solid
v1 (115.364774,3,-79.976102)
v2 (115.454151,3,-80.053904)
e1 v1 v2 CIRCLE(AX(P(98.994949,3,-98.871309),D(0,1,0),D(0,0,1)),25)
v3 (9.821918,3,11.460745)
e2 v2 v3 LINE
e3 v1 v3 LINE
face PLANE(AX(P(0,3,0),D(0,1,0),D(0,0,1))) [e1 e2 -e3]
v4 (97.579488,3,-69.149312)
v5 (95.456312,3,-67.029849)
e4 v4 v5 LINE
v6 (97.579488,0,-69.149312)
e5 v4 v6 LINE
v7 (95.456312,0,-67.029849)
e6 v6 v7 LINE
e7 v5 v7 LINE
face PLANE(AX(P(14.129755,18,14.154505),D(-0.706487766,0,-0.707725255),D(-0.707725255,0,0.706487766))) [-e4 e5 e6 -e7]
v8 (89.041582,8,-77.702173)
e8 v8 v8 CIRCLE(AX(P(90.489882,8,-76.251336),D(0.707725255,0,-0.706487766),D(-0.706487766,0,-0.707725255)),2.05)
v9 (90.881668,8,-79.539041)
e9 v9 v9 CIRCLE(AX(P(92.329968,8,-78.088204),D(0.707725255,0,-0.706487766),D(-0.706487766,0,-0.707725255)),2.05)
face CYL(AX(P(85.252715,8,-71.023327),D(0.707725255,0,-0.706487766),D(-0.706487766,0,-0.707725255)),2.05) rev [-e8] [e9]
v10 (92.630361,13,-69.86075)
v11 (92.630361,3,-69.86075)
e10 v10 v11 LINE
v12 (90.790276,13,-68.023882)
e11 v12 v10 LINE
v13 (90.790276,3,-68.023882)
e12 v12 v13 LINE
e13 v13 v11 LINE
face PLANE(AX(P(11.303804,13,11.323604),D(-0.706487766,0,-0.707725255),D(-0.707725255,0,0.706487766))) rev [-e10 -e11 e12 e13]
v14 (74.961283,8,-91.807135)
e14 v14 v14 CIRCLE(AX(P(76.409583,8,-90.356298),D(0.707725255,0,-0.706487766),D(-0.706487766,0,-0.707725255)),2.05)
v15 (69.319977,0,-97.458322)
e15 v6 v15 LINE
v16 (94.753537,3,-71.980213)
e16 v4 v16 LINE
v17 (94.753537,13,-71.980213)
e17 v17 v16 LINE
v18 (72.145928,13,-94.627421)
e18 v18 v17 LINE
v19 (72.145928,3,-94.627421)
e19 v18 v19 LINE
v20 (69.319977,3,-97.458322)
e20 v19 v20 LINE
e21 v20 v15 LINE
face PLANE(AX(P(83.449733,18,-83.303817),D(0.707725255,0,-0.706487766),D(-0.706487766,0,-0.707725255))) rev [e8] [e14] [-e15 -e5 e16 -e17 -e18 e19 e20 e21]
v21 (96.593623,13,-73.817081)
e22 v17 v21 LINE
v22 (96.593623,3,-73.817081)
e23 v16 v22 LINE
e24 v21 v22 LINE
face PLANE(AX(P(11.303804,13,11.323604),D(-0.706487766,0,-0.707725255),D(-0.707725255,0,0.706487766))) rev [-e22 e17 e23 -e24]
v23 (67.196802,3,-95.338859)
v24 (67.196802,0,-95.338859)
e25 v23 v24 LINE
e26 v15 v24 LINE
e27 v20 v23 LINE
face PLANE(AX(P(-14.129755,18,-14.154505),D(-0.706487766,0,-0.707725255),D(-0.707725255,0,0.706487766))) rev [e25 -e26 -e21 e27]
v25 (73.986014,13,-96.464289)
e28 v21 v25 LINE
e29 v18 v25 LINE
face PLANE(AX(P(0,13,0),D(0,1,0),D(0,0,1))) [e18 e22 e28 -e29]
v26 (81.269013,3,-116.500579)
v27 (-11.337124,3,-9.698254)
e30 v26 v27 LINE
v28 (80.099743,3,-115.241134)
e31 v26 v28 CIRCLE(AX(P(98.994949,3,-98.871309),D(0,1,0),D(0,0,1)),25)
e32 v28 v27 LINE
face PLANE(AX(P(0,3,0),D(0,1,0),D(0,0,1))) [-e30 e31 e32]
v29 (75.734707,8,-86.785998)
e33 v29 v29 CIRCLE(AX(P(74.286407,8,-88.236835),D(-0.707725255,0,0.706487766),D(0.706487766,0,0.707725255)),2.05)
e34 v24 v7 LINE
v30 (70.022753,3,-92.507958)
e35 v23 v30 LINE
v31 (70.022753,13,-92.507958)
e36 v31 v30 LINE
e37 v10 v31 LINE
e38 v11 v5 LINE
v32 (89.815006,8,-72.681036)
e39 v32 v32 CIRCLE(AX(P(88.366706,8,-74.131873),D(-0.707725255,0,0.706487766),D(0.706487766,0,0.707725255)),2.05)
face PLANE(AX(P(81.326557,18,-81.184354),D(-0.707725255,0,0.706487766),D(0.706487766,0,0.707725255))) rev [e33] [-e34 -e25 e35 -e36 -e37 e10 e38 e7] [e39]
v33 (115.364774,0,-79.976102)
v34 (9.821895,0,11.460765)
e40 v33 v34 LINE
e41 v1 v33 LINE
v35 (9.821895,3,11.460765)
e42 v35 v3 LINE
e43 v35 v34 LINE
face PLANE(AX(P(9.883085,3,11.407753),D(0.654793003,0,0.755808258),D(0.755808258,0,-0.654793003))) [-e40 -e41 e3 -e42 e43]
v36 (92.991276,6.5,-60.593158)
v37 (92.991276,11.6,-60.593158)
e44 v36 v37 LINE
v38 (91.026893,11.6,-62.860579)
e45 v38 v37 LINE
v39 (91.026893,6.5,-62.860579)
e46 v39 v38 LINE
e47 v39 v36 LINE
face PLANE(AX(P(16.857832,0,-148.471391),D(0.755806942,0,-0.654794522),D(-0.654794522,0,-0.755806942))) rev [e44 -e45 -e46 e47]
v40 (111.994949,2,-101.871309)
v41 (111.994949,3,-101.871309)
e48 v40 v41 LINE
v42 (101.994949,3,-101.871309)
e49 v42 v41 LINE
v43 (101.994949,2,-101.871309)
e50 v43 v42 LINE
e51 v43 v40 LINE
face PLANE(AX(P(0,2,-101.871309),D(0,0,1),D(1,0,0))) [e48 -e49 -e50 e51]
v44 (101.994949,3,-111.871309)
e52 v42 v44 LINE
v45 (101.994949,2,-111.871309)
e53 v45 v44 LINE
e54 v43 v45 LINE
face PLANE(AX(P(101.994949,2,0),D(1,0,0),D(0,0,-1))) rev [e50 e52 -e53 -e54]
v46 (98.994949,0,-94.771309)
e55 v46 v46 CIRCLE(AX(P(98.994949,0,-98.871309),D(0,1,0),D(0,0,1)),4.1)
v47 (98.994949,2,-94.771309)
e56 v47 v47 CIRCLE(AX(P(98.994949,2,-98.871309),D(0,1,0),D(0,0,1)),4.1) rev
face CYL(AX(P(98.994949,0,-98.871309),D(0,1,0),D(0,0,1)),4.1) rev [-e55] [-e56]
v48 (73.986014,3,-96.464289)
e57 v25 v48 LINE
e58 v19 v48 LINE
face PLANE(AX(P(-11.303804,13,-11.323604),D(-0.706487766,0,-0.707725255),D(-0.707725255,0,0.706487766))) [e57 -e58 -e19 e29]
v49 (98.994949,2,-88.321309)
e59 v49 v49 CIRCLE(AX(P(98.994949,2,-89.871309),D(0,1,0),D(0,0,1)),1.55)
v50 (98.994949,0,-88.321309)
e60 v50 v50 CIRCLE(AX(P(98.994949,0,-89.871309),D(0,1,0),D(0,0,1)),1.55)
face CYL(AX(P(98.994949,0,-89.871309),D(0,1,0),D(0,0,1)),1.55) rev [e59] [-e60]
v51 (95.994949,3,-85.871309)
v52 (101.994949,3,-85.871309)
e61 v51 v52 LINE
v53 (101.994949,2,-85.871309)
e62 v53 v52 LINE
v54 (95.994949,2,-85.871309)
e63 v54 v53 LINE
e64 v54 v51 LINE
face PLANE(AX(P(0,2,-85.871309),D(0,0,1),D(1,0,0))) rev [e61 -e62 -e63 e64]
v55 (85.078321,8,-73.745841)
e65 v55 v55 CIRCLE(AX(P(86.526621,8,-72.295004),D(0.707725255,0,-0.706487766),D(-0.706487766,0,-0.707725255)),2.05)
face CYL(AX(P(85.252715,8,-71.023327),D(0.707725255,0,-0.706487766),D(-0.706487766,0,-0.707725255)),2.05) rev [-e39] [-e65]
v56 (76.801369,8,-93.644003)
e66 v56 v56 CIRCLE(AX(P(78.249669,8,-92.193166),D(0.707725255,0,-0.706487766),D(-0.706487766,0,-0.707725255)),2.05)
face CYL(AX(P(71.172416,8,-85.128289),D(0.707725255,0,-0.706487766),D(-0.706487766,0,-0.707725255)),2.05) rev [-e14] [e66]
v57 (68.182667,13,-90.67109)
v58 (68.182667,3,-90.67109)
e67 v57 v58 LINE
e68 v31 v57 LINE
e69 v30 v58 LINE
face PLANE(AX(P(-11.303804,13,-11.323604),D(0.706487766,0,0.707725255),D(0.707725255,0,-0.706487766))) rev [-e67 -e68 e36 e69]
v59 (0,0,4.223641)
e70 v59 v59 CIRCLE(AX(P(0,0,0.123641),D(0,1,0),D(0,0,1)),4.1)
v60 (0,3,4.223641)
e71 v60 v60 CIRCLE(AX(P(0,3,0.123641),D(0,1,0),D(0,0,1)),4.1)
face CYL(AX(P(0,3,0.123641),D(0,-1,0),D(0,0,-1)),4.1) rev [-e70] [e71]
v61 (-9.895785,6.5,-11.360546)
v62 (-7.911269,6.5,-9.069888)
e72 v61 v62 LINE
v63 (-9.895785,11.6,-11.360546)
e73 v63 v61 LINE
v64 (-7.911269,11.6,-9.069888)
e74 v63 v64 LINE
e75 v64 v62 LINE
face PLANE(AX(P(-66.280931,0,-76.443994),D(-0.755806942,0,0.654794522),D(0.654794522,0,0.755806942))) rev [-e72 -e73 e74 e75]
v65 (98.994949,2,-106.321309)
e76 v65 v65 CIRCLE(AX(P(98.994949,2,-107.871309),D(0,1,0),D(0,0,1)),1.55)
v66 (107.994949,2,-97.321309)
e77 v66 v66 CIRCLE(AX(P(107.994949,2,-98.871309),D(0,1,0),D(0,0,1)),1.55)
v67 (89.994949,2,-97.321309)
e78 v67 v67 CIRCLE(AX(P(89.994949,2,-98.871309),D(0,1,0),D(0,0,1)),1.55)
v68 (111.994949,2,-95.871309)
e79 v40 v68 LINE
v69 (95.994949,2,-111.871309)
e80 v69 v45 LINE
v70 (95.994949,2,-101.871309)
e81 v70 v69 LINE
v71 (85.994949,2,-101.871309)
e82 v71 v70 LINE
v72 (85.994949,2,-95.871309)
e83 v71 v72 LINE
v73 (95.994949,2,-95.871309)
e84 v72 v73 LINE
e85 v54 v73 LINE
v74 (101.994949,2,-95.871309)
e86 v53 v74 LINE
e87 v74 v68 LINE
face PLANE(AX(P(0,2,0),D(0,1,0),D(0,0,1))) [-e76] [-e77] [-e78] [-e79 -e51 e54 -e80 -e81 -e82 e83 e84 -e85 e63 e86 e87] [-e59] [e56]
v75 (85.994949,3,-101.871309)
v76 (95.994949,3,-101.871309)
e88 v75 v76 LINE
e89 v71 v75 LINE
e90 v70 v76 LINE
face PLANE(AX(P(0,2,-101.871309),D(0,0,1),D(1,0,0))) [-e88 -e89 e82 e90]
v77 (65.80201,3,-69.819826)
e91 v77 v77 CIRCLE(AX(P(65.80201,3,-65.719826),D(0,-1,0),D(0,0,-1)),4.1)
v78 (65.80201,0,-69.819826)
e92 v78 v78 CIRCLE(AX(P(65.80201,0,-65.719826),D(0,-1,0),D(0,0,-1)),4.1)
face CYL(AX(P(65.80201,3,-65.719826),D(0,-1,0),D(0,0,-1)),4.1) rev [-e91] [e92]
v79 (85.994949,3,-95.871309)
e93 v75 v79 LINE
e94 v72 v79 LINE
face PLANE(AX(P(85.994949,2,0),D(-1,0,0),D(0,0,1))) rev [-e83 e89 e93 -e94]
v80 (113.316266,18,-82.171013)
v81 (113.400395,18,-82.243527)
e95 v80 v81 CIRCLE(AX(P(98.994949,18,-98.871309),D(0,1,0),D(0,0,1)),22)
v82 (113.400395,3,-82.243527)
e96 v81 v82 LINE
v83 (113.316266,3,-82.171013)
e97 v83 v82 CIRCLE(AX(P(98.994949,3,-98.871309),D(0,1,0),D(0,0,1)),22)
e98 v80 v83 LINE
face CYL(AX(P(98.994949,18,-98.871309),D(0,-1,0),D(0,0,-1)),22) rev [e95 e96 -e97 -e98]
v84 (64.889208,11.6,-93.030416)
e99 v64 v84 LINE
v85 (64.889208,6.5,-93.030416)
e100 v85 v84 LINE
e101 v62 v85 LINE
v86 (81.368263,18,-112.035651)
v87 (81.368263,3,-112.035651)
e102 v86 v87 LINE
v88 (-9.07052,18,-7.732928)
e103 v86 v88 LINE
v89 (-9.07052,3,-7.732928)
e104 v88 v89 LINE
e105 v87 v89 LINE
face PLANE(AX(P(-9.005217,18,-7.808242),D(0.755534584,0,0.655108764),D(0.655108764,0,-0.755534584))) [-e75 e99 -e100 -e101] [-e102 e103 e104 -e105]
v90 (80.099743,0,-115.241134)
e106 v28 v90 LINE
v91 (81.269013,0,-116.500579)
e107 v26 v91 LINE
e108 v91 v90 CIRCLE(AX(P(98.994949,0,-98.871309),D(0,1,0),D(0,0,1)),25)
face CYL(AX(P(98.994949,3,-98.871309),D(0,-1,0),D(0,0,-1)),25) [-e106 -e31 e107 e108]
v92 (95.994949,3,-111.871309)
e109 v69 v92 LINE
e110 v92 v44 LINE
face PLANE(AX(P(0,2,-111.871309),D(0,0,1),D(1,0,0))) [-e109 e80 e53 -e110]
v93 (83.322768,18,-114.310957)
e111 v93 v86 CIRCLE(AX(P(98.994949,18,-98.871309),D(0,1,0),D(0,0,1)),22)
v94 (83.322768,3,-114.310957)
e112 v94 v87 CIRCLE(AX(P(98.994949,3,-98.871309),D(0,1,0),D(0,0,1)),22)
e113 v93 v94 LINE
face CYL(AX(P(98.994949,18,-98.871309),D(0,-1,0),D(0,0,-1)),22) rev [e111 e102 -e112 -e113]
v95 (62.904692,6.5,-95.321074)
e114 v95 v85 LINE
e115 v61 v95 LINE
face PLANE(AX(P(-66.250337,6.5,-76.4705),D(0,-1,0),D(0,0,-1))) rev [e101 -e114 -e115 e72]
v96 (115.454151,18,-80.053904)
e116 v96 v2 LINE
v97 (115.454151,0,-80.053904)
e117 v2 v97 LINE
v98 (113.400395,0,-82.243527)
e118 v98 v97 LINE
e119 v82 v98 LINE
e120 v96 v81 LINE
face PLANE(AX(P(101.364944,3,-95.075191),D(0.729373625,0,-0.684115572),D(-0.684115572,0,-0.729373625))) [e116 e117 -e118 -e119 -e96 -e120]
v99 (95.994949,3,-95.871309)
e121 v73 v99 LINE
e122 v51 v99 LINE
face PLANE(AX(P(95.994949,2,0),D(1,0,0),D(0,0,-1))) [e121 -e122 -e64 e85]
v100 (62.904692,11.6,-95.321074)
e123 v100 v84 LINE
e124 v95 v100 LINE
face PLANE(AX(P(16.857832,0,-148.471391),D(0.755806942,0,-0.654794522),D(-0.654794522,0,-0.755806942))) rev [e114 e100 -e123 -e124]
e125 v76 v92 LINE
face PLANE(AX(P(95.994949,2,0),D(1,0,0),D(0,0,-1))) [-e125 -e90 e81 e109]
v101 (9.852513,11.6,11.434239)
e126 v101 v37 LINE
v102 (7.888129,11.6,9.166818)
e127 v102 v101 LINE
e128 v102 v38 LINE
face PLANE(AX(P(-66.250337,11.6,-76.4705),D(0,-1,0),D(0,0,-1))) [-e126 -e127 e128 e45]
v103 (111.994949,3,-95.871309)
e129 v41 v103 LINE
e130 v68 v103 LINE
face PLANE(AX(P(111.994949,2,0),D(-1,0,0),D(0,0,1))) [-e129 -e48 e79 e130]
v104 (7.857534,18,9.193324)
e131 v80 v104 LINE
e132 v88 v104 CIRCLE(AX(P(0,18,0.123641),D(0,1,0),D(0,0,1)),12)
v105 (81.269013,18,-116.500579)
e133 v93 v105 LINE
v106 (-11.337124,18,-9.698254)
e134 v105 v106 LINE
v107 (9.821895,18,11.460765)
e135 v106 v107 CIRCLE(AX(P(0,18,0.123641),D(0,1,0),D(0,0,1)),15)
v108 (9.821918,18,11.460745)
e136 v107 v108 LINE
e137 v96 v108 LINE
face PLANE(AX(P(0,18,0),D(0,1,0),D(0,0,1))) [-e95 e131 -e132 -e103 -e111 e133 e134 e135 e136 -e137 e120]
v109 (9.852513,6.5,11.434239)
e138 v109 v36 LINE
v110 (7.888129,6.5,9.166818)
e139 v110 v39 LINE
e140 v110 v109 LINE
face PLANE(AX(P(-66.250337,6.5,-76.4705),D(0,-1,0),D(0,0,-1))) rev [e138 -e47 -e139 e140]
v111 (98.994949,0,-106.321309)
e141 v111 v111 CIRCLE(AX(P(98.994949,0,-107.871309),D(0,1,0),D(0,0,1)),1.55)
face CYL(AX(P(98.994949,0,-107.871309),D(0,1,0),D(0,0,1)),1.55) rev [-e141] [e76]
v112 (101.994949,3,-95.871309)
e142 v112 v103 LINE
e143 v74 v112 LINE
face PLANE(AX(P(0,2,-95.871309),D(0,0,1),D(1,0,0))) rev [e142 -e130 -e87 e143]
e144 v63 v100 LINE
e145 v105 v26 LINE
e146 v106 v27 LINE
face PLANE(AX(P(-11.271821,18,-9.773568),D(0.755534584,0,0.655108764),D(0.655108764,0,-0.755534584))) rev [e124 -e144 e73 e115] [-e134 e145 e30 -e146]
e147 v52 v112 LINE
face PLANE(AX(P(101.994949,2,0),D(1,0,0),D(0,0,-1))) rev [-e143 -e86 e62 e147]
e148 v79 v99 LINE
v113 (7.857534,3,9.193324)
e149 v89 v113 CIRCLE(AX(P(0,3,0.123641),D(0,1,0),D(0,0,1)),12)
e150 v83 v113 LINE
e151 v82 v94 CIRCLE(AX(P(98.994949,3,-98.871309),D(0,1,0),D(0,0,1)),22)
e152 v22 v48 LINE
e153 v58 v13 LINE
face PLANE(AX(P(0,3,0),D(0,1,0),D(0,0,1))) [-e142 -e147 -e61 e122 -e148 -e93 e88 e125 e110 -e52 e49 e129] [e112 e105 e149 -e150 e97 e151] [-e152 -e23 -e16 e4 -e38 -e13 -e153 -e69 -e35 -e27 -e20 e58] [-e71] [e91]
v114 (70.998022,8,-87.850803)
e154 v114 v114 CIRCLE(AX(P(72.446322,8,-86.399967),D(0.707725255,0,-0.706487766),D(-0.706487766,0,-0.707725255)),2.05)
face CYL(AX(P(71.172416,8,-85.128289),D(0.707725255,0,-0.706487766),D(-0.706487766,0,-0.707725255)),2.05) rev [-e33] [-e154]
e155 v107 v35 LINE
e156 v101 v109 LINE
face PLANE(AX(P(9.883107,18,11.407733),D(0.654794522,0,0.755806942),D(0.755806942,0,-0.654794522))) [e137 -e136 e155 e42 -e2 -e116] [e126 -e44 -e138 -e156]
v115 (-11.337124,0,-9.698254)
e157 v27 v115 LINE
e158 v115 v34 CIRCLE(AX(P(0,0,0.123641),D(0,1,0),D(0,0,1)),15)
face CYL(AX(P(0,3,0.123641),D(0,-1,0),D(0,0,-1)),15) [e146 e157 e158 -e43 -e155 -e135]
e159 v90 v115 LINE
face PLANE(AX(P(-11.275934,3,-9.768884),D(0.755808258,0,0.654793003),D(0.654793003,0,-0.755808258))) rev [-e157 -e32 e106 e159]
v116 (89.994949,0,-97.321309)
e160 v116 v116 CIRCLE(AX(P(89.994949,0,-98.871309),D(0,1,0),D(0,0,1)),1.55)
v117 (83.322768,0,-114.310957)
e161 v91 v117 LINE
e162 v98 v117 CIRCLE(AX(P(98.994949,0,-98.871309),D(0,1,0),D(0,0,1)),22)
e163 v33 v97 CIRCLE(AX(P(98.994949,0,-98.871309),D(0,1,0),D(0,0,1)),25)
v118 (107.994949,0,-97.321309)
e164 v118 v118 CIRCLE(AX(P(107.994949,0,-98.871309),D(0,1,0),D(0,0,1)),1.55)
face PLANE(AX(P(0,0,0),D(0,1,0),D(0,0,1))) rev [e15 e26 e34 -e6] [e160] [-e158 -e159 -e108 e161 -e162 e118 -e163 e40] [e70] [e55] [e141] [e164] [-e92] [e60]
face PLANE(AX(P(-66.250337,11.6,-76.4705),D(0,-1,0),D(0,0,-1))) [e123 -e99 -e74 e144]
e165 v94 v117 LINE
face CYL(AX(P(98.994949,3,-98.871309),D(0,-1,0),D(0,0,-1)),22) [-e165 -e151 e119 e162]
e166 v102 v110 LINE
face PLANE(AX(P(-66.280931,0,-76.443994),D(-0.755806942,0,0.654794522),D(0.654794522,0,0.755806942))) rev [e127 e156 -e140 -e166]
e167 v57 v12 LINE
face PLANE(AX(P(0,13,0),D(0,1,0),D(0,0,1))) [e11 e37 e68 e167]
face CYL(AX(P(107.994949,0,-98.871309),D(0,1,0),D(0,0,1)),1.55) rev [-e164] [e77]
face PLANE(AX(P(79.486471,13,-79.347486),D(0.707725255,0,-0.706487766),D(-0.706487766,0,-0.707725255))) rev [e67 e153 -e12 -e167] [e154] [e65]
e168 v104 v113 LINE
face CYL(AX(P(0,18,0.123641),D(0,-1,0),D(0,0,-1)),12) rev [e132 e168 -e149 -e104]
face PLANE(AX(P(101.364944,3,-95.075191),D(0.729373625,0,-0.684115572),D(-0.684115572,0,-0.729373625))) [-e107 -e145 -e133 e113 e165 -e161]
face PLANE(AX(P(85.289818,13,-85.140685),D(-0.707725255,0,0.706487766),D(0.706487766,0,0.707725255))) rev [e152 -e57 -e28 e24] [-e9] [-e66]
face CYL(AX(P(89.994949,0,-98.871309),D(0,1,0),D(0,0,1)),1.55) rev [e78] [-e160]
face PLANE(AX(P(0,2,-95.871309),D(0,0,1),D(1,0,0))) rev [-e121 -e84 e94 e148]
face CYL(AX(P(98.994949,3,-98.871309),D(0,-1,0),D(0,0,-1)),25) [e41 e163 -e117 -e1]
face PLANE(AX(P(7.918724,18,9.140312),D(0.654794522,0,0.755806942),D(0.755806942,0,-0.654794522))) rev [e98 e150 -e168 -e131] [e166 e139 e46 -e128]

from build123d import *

# Parameters (mm, degrees)
SKETCH_2_R               = 2.1
SKETCH_2_R_2             = 4.1
EXTRUDE_2_DEPTH          = 3
EXTRUDE_3_DEPTH          = 15
SKETCH_4_R               = 4.1
SKETCH_4_R_2             = 2.1
EXTRUDE_4_DEPTH          = 10
EXTRUDE_START            = -13
EXTRUDE_5_DEPTH          = 13
SKETCH_7_R               = 1.3
CUT_EXTRUDE_1_DEPTH      = 13
CUT_EXTRUDE_2_DEPTH      = 174.68818701
CUT_EXTRUDE_2_DEPTH_BACK = 174.68818701
SKETCH_8_W               = 110
SKETCH_8_H               = 2.6
SKETCH_8_H_2             = 2.5
CUT_EXTRUDE_3_DEPTH      = 172.969913078
CUT_EXTRUDE_3_DEPTH_BACK = 172.969913078
EXTRUDE_6_DEPTH          = 10
SKETCH_11_R              = 2
CUT_EXTRUDE_4_DEPTH      = 10
SKETCH_13_R              = 2.05
CUT_EXTRUDE_5_DEPTH      = 10
SKETCH_14_R              = 4.1
EXTRUDE_7_DEPTH          = 3
CUT_EXTRUDE_6_DEPTH      = 3
SKETCH_19_R              = 4.1
CUT_EXTRUDE_9_DEPTH      = 172.518660805
CUT_EXTRUDE_14_DEPTH     = 1
CUT_EXTRUDE_15_DEPTH     = 172.772090295


# Read off the part's stored shape, not the designer's step: 凸台-拉伸3, 凸台-拉伸5
with BuildPart() as part:
    # 草图2 → 凸台-拉伸2 (new body)
    with BuildSketch(Plane(origin=(0, 0, 0), x_dir=(1, 0, 0), z_dir=(0, 1, 0))):
        with BuildLine():
            Line((80.099742919, 115.241133642), (-11.337123868, 9.698254241))
            ThreePointArc((-11.337123868, 9.698254241), (-10.606601718, -10.730242528), (9.821895051, -11.460764678))
            Line((9.821895051, -11.460764678), (115.364774452, 79.976102109))
            ThreePointArc((115.364774452, 79.976102109), (115.409508589, 80.014950331), (115.454150533, 80.053904459))
            Line((115.454150533, 80.053904459), (113.400395441, 82.243526883))
            ThreePointArc((113.400395441, 82.243526883), (115.041169115, 113.92185113), (83.322768112, 114.310956698))
            Line((83.322768112, 114.310956698), (81.26901302, 116.500579122))
            ThreePointArc((81.26901302, 116.500579122), (80.673552706, 115.880906565), (80.099742919, 115.241133642))
        make_face()
        with Locations(Location((98.994949366, 98.871308556, 0), (0, 0, 270))):
            Circle(SKETCH_2_R, mode=Mode.SUBTRACT)
        with Locations(Location((0, -0.12364081, 0), (0, 0, 270))):
            Circle(SKETCH_2_R_2, mode=Mode.SUBTRACT)
        with Locations(Location((70.710678119, 70.587037309, 0), (0, 0, 270))):
            Circle(SKETCH_2_R_2, mode=Mode.SUBTRACT)
    extrude(amount=EXTRUDE_2_DEPTH)

    # 凸台-拉伸3 outline → 凸台-拉伸3 (add)
    with BuildSketch(Plane(origin=(0, 3, 0), x_dir=(1, 0, 0), z_dir=(0, 1, 0))):
        with BuildLine():
            ThreePointArc((-11.337123868, 9.698254241), (-10.606601718, -10.730242528), (9.821895051, -11.460764678))
            Line((9.821895051, -11.460764678), (115.454150533, 80.053904459))
            Line((115.454150533, 80.053904459), (113.400395441, 82.243526883))
            ThreePointArc((113.400395441, 82.243526883), (113.358376595, 82.207216674), (113.316266225, 82.171012648))
            Line((113.316266225, 82.171012648), (7.857534265, -9.193324116))
            ThreePointArc((7.857534265, -9.193324116), (-8.484829636, -8.609373899), (-9.07051987, 7.732927734))
            Line((-9.07051987, 7.732927734), (81.368262538, 112.03565098))
            ThreePointArc((81.368262538, 112.03565098), (82.306692779, 113.206652712), (83.322768112, 114.310956698))
            Line((83.322768112, 114.310956698), (81.26901302, 116.500579122))
            Line((81.26901302, 116.500579122), (-11.337123868, 9.698254241))
        make_face()
    extrude(amount=EXTRUDE_3_DEPTH)

    # 草图4 → 凸台-拉伸4 (add)
    with BuildSketch(Plane(origin=(0, 3, 0), x_dir=(1, 0, 0), z_dir=(0, 1, 0))):
        with Locations(Location((98.994949366, 98.871308556, 0), (0, 0, 270))):
            Circle(SKETCH_4_R)
        with Locations(Location((98.994949366, 98.871308556, 0), (0, 0, 270))):
            Circle(SKETCH_4_R_2, mode=Mode.SUBTRACT)
    extrude(amount=EXTRUDE_4_DEPTH)

    # 凸台-拉伸5 outline → 凸台-拉伸5 (add)
    with BuildSketch(Plane(origin=(0, 13, 0), x_dir=(1, 0, 0), z_dir=(0, 1, 0)).offset(EXTRUDE_START)):
        with BuildLine():
            ThreePointArc((101.094850935, 98.891640782), (100.479873606, 100.356232796), (99.015281592, 100.971210125))
            Line((99.015281592, 100.971210125), (101.094850935, 98.891640782))
        make_face()
    extrude(amount=EXTRUDE_5_DEPTH)

    # 草图7 → 切除-拉伸1 (cut)
    with BuildSketch(Plane(origin=(99.993245858, 0, -99.993245858), x_dir=(0.7071067811865475, 0, 0.7071067811865477), z_dir=(-0.7071067811865477, 0, 0.7071067811865475))):
        with Locations((0, 5)):
            Circle(SKETCH_7_R)
    extrude(amount=-CUT_EXTRUDE_1_DEPTH, mode=Mode.SUBTRACT)

    # 草图8 → 切除-拉伸2 (cut, two sides: drawn at the far end of the back side and taken through both)
    with BuildSketch(Plane(origin=(9.883107451, 0, 11.40773322), x_dir=(0.75580694217799, 0, -0.6547945220873159), z_dir=(0.6547945220873159, 0, 0.75580694217799)).offset(-CUT_EXTRUDE_2_DEPTH_BACK)):
        with Locations((54.959520341, 10.3)):
            Rectangle(SKETCH_8_W, SKETCH_8_H)
        with Locations((54.959520341, 7.75)):
            Rectangle(SKETCH_8_W, SKETCH_8_H_2)
    extrude(amount=CUT_EXTRUDE_2_DEPTH + CUT_EXTRUDE_2_DEPTH_BACK, mode=Mode.SUBTRACT)

    # 草图9 → 切除-拉伸3 (cut, two sides: drawn at the far end of the back side and taken through both)
    with BuildSketch(Plane.XZ.offset(-CUT_EXTRUDE_3_DEPTH_BACK)):
        Polygon((83.449732713, -83.303817091), (81.326556947, -81.184353794), (67.196801633, -95.338858899), (69.319977399, -97.458322196), align=None)
        Polygon((95.456312261, -67.02984869), (81.326556947, -81.184353794), (83.449732713, -83.303817091), (97.579488027, -69.149311987), align=None)
    extrude(amount=CUT_EXTRUDE_3_DEPTH + CUT_EXTRUDE_3_DEPTH_BACK, mode=Mode.SUBTRACT)

    # 草图10 → 凸台-拉伸6 (add)
    with BuildSketch(Plane(origin=(0, 3, 0), x_dir=(1, 0, 0), z_dir=(0, 1, 0))):
        Polygon((81.326556947, 81.184353794), (70.022752696, 92.507957878), (68.182667032, 90.671089687), (79.486471284, 79.347485603), align=None)
        Polygon((92.630361199, 69.86074971), (81.326556947, 81.184353794), (79.486471284, 79.347485603), (90.790275535, 68.02388152), align=None)
        Polygon((73.986014125, 96.464289366), (72.145928462, 94.627421175), (83.449732713, 83.303817091), (94.753536964, 71.980213008), (96.593622628, 73.817081198), align=None)
    extrude(amount=EXTRUDE_6_DEPTH)

    # 草图11 → 切除-拉伸4 (cut)
    with BuildSketch(Plane(origin=(85.289818377, 0, -85.140685282), x_dir=(-0.7064877657092933, 0, -0.707725255238988), z_dir=(0.707725255238988, 0, -0.7064877657092933))):
        with Locations((-9.96499851, 8)):
            Circle(SKETCH_11_R)
        with Locations((9.96499851, 8)):
            Circle(SKETCH_11_R)
    extrude(amount=-CUT_EXTRUDE_4_DEPTH, mode=Mode.SUBTRACT)

    # 草图13 → 切除-拉伸5 (cut)
    with BuildSketch(Plane(origin=(85.289818377, 0, -85.140685282), x_dir=(-0.7064877657092933, 0, -0.707725255238988), z_dir=(0.707725255238988, 0, -0.7064877657092933))):
        with Locations((-9.96499851, 8)):
            Circle(SKETCH_13_R)
        with Locations((9.964998511, 8)):
            Circle(SKETCH_13_R)
    extrude(amount=-CUT_EXTRUDE_5_DEPTH, mode=Mode.SUBTRACT)

    # 草图14 → 凸台-拉伸7 (add)
    with BuildSketch(Plane.XZ):
        with Locations((70.710678119, -70.587037309)):
            Circle(SKETCH_14_R)
    extrude(amount=-EXTRUDE_7_DEPTH)

    # 草图15 → 切除-拉伸6 (cut)
    with BuildSketch(Plane.XZ):
        with BuildLine():
            ThreePointArc((69.902009877, -65.719825747), (67.369828397, -61.931429637), (62.901061054, -62.822500095))
            Line((62.901061054, -62.822500095), (65.802009877, -65.719825747))
            Line((65.802009877, -65.719825747), (68.702958699, -68.617151398))
            ThreePointArc((68.702958699, -68.617151398), (69.590405987, -67.287644267), (69.902009877, -65.719825747))
        make_face()
        with BuildLine():
            Line((65.802009877, -65.719825747), (62.901061054, -62.822500095))
            ThreePointArc((62.901061054, -62.822500095), (62.904684226, -68.620774569), (68.702958699, -68.617151398))
            Line((68.702958699, -68.617151398), (65.802009877, -65.719825747))
        make_face()
    extrude(amount=-CUT_EXTRUDE_6_DEPTH, mode=Mode.SUBTRACT)

    # 草图19 → 切除-拉伸9 (cut, through all)
    with BuildSketch(Plane(origin=(0, 13, 0), x_dir=(1, 0, 0), z_dir=(0, 1, 0))):
        with Locations(Location((98.994949366, 98.871308556, 0), (0, 0, 270))):
            Circle(SKETCH_19_R)
    extrude(amount=-CUT_EXTRUDE_9_DEPTH, mode=Mode.SUBTRACT)

    # 草图22 → 切除-拉伸14 (cut)
    with BuildSketch(Plane(origin=(0, 3, 0), x_dir=(1, 0, 0), z_dir=(0, 1, 0))):
        with BuildLine():
            Line((95.994949366, 101.871308556), (85.994949366, 101.871308556))
            Line((85.994949366, 101.871308556), (85.994949366, 95.871308556))
            Line((85.994949366, 95.871308556), (95.994949366, 95.871308556))
            Line((95.994949366, 95.871308556), (95.994949366, 96.076670834))
            ThreePointArc((95.994949366, 96.076670834), (94.894949366, 98.871308556), (95.994949366, 101.665946279))
            Line((95.994949366, 101.665946279), (95.994949366, 101.871308556))
        make_face()
        with BuildLine():
            Line((95.994949366, 111.871308556), (95.994949366, 101.871308556))
            Line((95.994949366, 101.871308556), (96.200311644, 101.871308556))
            ThreePointArc((96.200311644, 101.871308556), (98.994949366, 102.971308556), (101.789587089, 101.871308556))
            Line((101.789587089, 101.871308556), (101.994949366, 101.871308556))
            Line((101.994949366, 101.871308556), (101.994949366, 111.871308556))
            Line((101.994949366, 111.871308556), (95.994949366, 111.871308556))
        make_face()
        with BuildLine():
            Line((111.994949366, 101.871308556), (101.994949366, 101.871308556))
            Line((101.994949366, 101.871308556), (101.994949366, 101.665946279))
            ThreePointArc((101.994949366, 101.665946279), (102.810050938, 100.372974298), (103.094949366, 98.871308556))
            ThreePointArc((103.094949366, 98.871308556), (102.810050938, 97.369642814), (101.994949366, 96.076670834))
            Line((101.994949366, 96.076670834), (101.994949366, 95.871308556))
            Line((101.994949366, 95.871308556), (111.994949366, 95.871308556))
            Line((111.994949366, 95.871308556), (111.994949366, 101.871308556))
        make_face()
        with BuildLine():
            Line((96.200311644, 95.871308556), (95.994949366, 95.871308556))
            Line((95.994949366, 95.871308556), (95.994949366, 85.871308556))
            Line((95.994949366, 85.871308556), (101.994949366, 85.871308556))
            Line((101.994949366, 85.871308556), (101.994949366, 95.871308556))
            Line((101.994949366, 95.871308556), (101.789587089, 95.871308556))
            ThreePointArc((101.789587089, 95.871308556), (98.994949366, 94.771308556), (96.200311644, 95.871308556))
        make_face()
        with BuildLine():
            Line((95.994949366, 96.076670834), (95.994949366, 95.871308556))
            Line((95.994949366, 95.871308556), (96.200311644, 95.871308556))
            ThreePointArc((96.200311644, 95.871308556), (96.095811563, 95.972170753), (95.994949366, 96.076670834))
        make_face()
        with BuildLine():
            ThreePointArc((101.994949366, 96.076670834), (101.894087169, 95.972170753), (101.789587089, 95.871308556))
            Line((101.789587089, 95.871308556), (101.994949366, 95.871308556))
            Line((101.994949366, 95.871308556), (101.994949366, 96.076670834))
        make_face()
        with BuildLine():
            Line((101.994949366, 101.871308556), (101.789587089, 101.871308556))
            ThreePointArc((101.789587089, 101.871308556), (101.894087169, 101.770446359), (101.994949366, 101.665946279))
            Line((101.994949366, 101.665946279), (101.994949366, 101.871308556))
        make_face()
        with BuildLine():
            Line((96.200311644, 101.871308556), (95.994949366, 101.871308556))
            Line((95.994949366, 101.871308556), (95.994949366, 101.665946279))
            ThreePointArc((95.994949366, 101.665946279), (96.095811563, 101.770446359), (96.200311644, 101.871308556))
        make_face()
    extrude(amount=-CUT_EXTRUDE_14_DEPTH, mode=Mode.SUBTRACT)

    # 草图24 → 切除-拉伸15 (cut, through all)
    with BuildSketch(Plane(origin=(0, 2, 0), x_dir=(1, 0, 0), z_dir=(0, 1, 0))):
        with BuildLine():
            ThreePointArc((90.128421588, 97.32706597), (91.137180066, 97.823544734), (91.544949366, 98.871308556))
            Line((91.544949366, 98.871308556), (89.994949366, 98.871308556))
            ThreePointArc((89.994949366, 98.871308556), (90.028379509, 98.096308556), (90.128421588, 97.32706597))
        make_face()
        with BuildLine():
            Line((89.994949366, 98.871308556), (91.544949366, 98.871308556))
            ThreePointArc((91.544949366, 98.871308556), (91.137180066, 99.919072379), (90.128421588, 100.415551143))
            ThreePointArc((90.128421588, 100.415551143), (90.028379509, 99.646308556), (89.994949366, 98.871308556))
        make_face()
        with BuildLine():
            ThreePointArc((90.128421588, 97.32706597), (90.028379509, 98.096308556), (89.994949366, 98.871308556))
            Line((89.994949366, 98.871308556), (88.444949366, 98.871308556))
            ThreePointArc((88.444949366, 98.871308556), (88.947185544, 97.729077856), (90.128421588, 97.32706597))
        make_face()
        with BuildLine():
            Line((88.444949366, 98.871308556), (89.994949366, 98.871308556))
            ThreePointArc((89.994949366, 98.871308556), (90.028379509, 99.646308556), (90.128421588, 100.415551143))
            ThreePointArc((90.128421588, 100.415551143), (88.947185544, 100.013539256), (88.444949366, 98.871308556))
        make_face()
        with BuildLine():
            ThreePointArc((98.994949366, 107.871308556), (99.769949366, 107.837878413), (100.539191953, 107.737836334))
            ThreePointArc((100.539191953, 107.737836334), (100.543509344, 107.804510386), (100.544949366, 107.871308556))
            ThreePointArc((100.544949366, 107.871308556), (100.090964877, 108.967324067), (98.994949366, 109.421308556))
            Line((98.994949366, 109.421308556), (98.994949366, 107.871308556))
        make_face()
        with BuildLine():
            ThreePointArc((98.994949366, 106.321308556), (100.042713189, 106.729077856), (100.539191953, 107.737836334))
            ThreePointArc((100.539191953, 107.737836334), (99.769949366, 107.837878413), (98.994949366, 107.871308556))
            Line((98.994949366, 107.871308556), (98.994949366, 106.321308556))
        make_face()
        with BuildLine():
            ThreePointArc((97.45070678, 107.737836334), (97.947185544, 106.729077856), (98.994949366, 106.321308556))
            Line((98.994949366, 106.321308556), (98.994949366, 107.871308556))
            ThreePointArc((98.994949366, 107.871308556), (98.219949366, 107.837878413), (97.45070678, 107.737836334))
        make_face()
        with BuildLine():
            ThreePointArc((97.45070678, 107.737836334), (98.219949366, 107.837878413), (98.994949366, 107.871308556))
            Line((98.994949366, 107.871308556), (98.994949366, 109.421308556))
            ThreePointArc((98.994949366, 109.421308556), (97.852718666, 108.919072379), (97.45070678, 107.737836334))
        make_face()
        with BuildLine():
            ThreePointArc((107.861477144, 100.415551143), (107.961519223, 99.646308556), (107.994949366, 98.871308556))
            Line((107.994949366, 98.871308556), (109.544949366, 98.871308556))
            ThreePointArc((109.544949366, 98.871308556), (109.042713189, 100.013539256), (107.861477144, 100.415551143))
        make_face()
        with BuildLine():
            ThreePointArc((107.861477144, 97.32706597), (107.961519223, 98.096308556), (107.994949366, 98.871308556))
            Line((107.994949366, 98.871308556), (106.444949366, 98.871308556))
            ThreePointArc((106.444949366, 98.871308556), (106.852718666, 97.823544734), (107.861477144, 97.32706597))
        make_face()
        with BuildLine():
            Line((106.444949366, 98.871308556), (107.994949366, 98.871308556))
            ThreePointArc((107.994949366, 98.871308556), (107.961519223, 99.646308556), (107.861477144, 100.415551143))
            ThreePointArc((107.861477144, 100.415551143), (106.852718666, 99.919072379), (106.444949366, 98.871308556))
        make_face()
        with BuildLine():
            Line((109.544949366, 98.871308556), (107.994949366, 98.871308556))
            ThreePointArc((107.994949366, 98.871308556), (107.961519223, 98.096308556), (107.861477144, 97.32706597))
            ThreePointArc((107.861477144, 97.32706597), (109.042713189, 97.729077856), (109.544949366, 98.871308556))
        make_face()
        with BuildLine():
            ThreePointArc((100.544949366, 89.871308556), (100.543509344, 89.938106726), (100.539191953, 90.004780778))
            ThreePointArc((100.539191953, 90.004780778), (99.769949366, 89.904738699), (98.994949366, 89.871308556))
            Line((98.994949366, 89.871308556), (98.994949366, 88.321308556))
            ThreePointArc((98.994949366, 88.321308556), (100.090964877, 88.775293045), (100.544949366, 89.871308556))
        make_face()
        with BuildLine():
            ThreePointArc((98.994949366, 89.871308556), (99.769949366, 89.904738699), (100.539191953, 90.004780778))
            ThreePointArc((100.539191953, 90.004780778), (100.042713189, 91.013539256), (98.994949366, 91.421308556))
            Line((98.994949366, 91.421308556), (98.994949366, 89.871308556))
        make_face()
        with BuildLine():
            Line((98.994949366, 89.871308556), (98.994949366, 91.421308556))
            ThreePointArc((98.994949366, 91.421308556), (97.947185544, 91.013539256), (97.45070678, 90.004780778))
            ThreePointArc((97.45070678, 90.004780778), (98.219949366, 89.904738699), (98.994949366, 89.871308556))
        make_face()
        with BuildLine():
            Line((98.994949366, 88.321308556), (98.994949366, 89.871308556))
            ThreePointArc((98.994949366, 89.871308556), (98.219949366, 89.904738699), (97.45070678, 90.004780778))
            ThreePointArc((97.45070678, 90.004780778), (97.852718666, 88.823544734), (98.994949366, 88.321308556))
        make_face()
    extrude(amount=-CUT_EXTRUDE_15_DEPTH, mode=Mode.SUBTRACT)


solid = part.part
